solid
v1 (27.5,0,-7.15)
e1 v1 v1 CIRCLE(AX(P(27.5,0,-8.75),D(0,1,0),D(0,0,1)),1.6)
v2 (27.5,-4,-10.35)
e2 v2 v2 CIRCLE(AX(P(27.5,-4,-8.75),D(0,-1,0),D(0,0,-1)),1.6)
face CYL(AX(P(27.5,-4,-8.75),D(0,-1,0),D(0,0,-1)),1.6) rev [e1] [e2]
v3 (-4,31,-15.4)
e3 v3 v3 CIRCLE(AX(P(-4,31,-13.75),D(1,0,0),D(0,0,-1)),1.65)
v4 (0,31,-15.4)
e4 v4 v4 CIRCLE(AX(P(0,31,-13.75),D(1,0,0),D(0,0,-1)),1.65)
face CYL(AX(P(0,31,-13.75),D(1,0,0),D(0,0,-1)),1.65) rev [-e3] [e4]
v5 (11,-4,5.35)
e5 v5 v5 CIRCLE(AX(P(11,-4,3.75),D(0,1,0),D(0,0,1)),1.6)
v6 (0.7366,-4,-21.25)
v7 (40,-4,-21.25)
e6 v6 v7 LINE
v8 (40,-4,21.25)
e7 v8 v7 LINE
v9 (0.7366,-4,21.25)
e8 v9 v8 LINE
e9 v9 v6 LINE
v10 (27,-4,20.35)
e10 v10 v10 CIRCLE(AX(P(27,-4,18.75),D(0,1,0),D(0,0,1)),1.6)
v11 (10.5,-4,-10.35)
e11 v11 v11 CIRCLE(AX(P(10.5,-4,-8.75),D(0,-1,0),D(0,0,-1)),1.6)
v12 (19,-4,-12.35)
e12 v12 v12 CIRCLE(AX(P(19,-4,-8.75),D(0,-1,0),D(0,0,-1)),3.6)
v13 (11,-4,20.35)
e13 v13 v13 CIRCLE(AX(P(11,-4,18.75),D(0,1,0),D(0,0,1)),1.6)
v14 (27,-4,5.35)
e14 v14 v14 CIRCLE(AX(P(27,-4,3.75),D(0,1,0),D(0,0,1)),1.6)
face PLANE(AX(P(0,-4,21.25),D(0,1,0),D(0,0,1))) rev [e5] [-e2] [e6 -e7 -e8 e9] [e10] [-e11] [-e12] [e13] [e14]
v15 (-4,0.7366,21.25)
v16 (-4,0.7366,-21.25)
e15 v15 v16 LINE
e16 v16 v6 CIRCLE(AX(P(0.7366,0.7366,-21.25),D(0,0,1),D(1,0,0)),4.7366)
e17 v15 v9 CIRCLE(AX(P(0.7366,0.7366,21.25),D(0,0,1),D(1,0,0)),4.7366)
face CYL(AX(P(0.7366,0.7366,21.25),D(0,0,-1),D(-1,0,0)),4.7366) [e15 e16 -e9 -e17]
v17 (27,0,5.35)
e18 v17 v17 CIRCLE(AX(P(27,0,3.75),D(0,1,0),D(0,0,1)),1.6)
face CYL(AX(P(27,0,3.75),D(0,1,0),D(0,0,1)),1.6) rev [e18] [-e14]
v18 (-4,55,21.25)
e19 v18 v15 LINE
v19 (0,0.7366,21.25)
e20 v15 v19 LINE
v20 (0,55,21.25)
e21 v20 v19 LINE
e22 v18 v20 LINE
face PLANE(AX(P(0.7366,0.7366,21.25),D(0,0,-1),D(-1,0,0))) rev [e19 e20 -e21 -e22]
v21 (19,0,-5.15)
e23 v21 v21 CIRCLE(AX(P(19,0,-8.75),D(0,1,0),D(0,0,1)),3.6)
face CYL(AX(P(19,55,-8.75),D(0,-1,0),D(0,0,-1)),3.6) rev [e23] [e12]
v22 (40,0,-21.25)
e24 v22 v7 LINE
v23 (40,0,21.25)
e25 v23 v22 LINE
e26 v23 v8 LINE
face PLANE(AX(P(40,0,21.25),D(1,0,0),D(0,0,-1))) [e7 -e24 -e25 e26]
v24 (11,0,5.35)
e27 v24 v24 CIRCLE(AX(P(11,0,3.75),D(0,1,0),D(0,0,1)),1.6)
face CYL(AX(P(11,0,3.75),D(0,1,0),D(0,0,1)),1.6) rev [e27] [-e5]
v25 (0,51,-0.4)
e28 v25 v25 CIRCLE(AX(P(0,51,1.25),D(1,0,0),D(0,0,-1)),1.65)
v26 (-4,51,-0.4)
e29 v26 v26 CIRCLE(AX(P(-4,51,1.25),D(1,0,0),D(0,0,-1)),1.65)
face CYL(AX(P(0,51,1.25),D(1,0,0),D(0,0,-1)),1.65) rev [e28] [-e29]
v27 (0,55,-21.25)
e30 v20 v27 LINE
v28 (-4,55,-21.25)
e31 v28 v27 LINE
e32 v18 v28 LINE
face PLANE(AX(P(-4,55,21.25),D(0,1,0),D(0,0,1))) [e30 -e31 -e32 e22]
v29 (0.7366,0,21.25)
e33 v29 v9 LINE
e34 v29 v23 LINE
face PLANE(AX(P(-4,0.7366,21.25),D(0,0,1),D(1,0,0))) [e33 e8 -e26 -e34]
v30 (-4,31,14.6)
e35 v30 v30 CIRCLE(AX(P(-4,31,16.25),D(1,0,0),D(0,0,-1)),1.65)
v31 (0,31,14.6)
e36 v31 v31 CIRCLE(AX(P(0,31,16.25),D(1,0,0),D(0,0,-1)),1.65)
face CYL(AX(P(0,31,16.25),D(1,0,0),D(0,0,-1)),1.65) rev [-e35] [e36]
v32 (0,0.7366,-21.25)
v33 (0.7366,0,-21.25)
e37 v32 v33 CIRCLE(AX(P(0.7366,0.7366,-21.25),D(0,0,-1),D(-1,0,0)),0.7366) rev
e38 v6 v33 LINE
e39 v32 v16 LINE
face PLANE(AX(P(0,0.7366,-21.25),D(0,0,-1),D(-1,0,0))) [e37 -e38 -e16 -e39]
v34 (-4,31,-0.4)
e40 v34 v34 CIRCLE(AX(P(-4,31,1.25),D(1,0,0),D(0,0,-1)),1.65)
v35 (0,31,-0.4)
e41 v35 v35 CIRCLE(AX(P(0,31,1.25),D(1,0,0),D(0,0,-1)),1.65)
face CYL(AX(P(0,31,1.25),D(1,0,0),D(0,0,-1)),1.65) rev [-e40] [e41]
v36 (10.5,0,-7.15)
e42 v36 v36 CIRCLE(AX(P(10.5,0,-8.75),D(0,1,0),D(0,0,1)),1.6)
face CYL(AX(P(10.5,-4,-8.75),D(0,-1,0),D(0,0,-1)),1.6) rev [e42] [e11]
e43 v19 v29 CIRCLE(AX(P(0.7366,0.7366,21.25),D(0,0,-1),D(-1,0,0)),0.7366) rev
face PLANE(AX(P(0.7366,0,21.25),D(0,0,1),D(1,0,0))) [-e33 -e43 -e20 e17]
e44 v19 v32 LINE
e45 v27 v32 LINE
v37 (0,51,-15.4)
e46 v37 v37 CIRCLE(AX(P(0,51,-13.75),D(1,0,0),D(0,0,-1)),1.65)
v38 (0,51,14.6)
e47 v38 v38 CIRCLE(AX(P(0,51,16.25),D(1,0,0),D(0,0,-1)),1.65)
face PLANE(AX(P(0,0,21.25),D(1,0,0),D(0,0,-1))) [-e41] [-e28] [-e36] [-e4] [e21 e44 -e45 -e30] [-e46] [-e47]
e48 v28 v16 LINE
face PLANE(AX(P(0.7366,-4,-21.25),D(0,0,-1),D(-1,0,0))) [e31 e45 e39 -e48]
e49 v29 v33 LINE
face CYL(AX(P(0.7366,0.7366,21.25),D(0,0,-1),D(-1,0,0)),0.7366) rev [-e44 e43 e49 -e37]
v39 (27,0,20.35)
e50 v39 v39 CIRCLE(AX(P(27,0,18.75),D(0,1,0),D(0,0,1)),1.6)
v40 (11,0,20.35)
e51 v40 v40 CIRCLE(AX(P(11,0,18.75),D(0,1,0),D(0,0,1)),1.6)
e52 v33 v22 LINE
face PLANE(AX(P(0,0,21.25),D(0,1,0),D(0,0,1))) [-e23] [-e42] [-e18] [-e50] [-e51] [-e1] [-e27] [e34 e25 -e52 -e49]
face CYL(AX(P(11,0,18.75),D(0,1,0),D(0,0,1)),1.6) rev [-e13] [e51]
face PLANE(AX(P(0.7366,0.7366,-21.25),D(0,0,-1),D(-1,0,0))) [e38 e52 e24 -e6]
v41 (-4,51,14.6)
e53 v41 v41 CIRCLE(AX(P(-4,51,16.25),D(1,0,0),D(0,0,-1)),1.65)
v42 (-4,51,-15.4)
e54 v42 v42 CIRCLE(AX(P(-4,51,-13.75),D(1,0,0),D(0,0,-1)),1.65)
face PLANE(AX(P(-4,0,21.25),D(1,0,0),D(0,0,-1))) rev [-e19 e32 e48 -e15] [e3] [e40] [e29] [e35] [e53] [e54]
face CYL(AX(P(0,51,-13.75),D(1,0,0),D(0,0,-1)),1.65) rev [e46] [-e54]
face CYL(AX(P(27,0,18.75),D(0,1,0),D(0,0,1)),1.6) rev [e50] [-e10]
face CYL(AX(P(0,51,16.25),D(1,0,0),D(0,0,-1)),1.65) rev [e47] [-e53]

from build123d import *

# Parameters (mm, degrees)
SM_BASE_FLANGE_2_DEPTH = 21.25
HOLE_WIZARD_M3_1_D     = 3.2
SKETCH_24_R            = 3.6
CUT_EXTRUDE_2_DEPTH    = 75.381197221
M4X0_7_1_D             = 3.3
HOLE_WIZARD_M3_2_D     = 3.2
PATTERN_LINEAR_1_COUNT = 3
PATTERN_LINEAR_1_PITCH = 15


# Sheet-metal steps are written as plain solids
with BuildPart() as part:
    # 草圖16 → 基材-凸緣2 (new, symmetric)
    with BuildSketch(Plane.XY):
        with BuildLine():
            Line((40, 0), (0.7366, 0))
            ThreePointArc((0.7366, 0), (0.215745145, 0.215745145), (0, 0.7366))
            Line((0, 0.7366), (0, 55))
            Line((0, 55), (-4, 55))
            Line((-4, 55), (-4, 0.7366))
            ThreePointArc((-4, 0.7366), (-2.61268198, -2.61268198), (0.7366, -4))
            Line((0.7366, -4), (40, -4))
            Line((40, -4), (40, 0))
        make_face()
    extrude(amount=SM_BASE_FLANGE_2_DEPTH, both=True)

    # M3 餘隙孔1 (through all)
    with Locations(Plane(origin=(0, 0, 0), x_dir=(-1, 0, 0), z_dir=(0, 1, 0))):
        with Locations((-27, 18.75), (-11, 3.75), (-11, 18.75), (-27, 3.75)):
            Hole(HOLE_WIZARD_M3_1_D / 2)

    # 草圖24 → 除料-伸長2 (cut, through all)
    with BuildSketch(Plane.XZ.offset(4)):
        with Locations(Location((19, -8.75, 0), (0, 0, 270))):
            Circle(SKETCH_24_R)
    extrude(amount=-CUT_EXTRUDE_2_DEPTH, mode=Mode.SUBTRACT)

    # M4x0.7 螺紋孔1 (through all)
    with Locations(Plane(origin=(0, 0, 0), x_dir=(0, 0, 1), z_dir=(1, 0, 0))):
        with Locations((16.25, -51), (16.25, -31)):
            m4x0_7_1 = Hole(M4X0_7_1_D / 2)

    # M3 餘隙孔2 (through all)
    with Locations(Plane(origin=(0, -4, 0), x_dir=(-1, 0, 0), z_dir=(0, -1, 0))):
        with Locations((-27.5, 8.75), (-10.5, 8.75)):
            Hole(HOLE_WIZARD_M3_2_D / 2)

    # 直線複製排列1: M4x0.7 螺紋孔1 ×3
    with Locations(*[(0, 0, -i * PATTERN_LINEAR_1_PITCH) for i in range(1, PATTERN_LINEAR_1_COUNT)]):
        add(m4x0_7_1, mode=Mode.SUBTRACT)


solid = part.part
